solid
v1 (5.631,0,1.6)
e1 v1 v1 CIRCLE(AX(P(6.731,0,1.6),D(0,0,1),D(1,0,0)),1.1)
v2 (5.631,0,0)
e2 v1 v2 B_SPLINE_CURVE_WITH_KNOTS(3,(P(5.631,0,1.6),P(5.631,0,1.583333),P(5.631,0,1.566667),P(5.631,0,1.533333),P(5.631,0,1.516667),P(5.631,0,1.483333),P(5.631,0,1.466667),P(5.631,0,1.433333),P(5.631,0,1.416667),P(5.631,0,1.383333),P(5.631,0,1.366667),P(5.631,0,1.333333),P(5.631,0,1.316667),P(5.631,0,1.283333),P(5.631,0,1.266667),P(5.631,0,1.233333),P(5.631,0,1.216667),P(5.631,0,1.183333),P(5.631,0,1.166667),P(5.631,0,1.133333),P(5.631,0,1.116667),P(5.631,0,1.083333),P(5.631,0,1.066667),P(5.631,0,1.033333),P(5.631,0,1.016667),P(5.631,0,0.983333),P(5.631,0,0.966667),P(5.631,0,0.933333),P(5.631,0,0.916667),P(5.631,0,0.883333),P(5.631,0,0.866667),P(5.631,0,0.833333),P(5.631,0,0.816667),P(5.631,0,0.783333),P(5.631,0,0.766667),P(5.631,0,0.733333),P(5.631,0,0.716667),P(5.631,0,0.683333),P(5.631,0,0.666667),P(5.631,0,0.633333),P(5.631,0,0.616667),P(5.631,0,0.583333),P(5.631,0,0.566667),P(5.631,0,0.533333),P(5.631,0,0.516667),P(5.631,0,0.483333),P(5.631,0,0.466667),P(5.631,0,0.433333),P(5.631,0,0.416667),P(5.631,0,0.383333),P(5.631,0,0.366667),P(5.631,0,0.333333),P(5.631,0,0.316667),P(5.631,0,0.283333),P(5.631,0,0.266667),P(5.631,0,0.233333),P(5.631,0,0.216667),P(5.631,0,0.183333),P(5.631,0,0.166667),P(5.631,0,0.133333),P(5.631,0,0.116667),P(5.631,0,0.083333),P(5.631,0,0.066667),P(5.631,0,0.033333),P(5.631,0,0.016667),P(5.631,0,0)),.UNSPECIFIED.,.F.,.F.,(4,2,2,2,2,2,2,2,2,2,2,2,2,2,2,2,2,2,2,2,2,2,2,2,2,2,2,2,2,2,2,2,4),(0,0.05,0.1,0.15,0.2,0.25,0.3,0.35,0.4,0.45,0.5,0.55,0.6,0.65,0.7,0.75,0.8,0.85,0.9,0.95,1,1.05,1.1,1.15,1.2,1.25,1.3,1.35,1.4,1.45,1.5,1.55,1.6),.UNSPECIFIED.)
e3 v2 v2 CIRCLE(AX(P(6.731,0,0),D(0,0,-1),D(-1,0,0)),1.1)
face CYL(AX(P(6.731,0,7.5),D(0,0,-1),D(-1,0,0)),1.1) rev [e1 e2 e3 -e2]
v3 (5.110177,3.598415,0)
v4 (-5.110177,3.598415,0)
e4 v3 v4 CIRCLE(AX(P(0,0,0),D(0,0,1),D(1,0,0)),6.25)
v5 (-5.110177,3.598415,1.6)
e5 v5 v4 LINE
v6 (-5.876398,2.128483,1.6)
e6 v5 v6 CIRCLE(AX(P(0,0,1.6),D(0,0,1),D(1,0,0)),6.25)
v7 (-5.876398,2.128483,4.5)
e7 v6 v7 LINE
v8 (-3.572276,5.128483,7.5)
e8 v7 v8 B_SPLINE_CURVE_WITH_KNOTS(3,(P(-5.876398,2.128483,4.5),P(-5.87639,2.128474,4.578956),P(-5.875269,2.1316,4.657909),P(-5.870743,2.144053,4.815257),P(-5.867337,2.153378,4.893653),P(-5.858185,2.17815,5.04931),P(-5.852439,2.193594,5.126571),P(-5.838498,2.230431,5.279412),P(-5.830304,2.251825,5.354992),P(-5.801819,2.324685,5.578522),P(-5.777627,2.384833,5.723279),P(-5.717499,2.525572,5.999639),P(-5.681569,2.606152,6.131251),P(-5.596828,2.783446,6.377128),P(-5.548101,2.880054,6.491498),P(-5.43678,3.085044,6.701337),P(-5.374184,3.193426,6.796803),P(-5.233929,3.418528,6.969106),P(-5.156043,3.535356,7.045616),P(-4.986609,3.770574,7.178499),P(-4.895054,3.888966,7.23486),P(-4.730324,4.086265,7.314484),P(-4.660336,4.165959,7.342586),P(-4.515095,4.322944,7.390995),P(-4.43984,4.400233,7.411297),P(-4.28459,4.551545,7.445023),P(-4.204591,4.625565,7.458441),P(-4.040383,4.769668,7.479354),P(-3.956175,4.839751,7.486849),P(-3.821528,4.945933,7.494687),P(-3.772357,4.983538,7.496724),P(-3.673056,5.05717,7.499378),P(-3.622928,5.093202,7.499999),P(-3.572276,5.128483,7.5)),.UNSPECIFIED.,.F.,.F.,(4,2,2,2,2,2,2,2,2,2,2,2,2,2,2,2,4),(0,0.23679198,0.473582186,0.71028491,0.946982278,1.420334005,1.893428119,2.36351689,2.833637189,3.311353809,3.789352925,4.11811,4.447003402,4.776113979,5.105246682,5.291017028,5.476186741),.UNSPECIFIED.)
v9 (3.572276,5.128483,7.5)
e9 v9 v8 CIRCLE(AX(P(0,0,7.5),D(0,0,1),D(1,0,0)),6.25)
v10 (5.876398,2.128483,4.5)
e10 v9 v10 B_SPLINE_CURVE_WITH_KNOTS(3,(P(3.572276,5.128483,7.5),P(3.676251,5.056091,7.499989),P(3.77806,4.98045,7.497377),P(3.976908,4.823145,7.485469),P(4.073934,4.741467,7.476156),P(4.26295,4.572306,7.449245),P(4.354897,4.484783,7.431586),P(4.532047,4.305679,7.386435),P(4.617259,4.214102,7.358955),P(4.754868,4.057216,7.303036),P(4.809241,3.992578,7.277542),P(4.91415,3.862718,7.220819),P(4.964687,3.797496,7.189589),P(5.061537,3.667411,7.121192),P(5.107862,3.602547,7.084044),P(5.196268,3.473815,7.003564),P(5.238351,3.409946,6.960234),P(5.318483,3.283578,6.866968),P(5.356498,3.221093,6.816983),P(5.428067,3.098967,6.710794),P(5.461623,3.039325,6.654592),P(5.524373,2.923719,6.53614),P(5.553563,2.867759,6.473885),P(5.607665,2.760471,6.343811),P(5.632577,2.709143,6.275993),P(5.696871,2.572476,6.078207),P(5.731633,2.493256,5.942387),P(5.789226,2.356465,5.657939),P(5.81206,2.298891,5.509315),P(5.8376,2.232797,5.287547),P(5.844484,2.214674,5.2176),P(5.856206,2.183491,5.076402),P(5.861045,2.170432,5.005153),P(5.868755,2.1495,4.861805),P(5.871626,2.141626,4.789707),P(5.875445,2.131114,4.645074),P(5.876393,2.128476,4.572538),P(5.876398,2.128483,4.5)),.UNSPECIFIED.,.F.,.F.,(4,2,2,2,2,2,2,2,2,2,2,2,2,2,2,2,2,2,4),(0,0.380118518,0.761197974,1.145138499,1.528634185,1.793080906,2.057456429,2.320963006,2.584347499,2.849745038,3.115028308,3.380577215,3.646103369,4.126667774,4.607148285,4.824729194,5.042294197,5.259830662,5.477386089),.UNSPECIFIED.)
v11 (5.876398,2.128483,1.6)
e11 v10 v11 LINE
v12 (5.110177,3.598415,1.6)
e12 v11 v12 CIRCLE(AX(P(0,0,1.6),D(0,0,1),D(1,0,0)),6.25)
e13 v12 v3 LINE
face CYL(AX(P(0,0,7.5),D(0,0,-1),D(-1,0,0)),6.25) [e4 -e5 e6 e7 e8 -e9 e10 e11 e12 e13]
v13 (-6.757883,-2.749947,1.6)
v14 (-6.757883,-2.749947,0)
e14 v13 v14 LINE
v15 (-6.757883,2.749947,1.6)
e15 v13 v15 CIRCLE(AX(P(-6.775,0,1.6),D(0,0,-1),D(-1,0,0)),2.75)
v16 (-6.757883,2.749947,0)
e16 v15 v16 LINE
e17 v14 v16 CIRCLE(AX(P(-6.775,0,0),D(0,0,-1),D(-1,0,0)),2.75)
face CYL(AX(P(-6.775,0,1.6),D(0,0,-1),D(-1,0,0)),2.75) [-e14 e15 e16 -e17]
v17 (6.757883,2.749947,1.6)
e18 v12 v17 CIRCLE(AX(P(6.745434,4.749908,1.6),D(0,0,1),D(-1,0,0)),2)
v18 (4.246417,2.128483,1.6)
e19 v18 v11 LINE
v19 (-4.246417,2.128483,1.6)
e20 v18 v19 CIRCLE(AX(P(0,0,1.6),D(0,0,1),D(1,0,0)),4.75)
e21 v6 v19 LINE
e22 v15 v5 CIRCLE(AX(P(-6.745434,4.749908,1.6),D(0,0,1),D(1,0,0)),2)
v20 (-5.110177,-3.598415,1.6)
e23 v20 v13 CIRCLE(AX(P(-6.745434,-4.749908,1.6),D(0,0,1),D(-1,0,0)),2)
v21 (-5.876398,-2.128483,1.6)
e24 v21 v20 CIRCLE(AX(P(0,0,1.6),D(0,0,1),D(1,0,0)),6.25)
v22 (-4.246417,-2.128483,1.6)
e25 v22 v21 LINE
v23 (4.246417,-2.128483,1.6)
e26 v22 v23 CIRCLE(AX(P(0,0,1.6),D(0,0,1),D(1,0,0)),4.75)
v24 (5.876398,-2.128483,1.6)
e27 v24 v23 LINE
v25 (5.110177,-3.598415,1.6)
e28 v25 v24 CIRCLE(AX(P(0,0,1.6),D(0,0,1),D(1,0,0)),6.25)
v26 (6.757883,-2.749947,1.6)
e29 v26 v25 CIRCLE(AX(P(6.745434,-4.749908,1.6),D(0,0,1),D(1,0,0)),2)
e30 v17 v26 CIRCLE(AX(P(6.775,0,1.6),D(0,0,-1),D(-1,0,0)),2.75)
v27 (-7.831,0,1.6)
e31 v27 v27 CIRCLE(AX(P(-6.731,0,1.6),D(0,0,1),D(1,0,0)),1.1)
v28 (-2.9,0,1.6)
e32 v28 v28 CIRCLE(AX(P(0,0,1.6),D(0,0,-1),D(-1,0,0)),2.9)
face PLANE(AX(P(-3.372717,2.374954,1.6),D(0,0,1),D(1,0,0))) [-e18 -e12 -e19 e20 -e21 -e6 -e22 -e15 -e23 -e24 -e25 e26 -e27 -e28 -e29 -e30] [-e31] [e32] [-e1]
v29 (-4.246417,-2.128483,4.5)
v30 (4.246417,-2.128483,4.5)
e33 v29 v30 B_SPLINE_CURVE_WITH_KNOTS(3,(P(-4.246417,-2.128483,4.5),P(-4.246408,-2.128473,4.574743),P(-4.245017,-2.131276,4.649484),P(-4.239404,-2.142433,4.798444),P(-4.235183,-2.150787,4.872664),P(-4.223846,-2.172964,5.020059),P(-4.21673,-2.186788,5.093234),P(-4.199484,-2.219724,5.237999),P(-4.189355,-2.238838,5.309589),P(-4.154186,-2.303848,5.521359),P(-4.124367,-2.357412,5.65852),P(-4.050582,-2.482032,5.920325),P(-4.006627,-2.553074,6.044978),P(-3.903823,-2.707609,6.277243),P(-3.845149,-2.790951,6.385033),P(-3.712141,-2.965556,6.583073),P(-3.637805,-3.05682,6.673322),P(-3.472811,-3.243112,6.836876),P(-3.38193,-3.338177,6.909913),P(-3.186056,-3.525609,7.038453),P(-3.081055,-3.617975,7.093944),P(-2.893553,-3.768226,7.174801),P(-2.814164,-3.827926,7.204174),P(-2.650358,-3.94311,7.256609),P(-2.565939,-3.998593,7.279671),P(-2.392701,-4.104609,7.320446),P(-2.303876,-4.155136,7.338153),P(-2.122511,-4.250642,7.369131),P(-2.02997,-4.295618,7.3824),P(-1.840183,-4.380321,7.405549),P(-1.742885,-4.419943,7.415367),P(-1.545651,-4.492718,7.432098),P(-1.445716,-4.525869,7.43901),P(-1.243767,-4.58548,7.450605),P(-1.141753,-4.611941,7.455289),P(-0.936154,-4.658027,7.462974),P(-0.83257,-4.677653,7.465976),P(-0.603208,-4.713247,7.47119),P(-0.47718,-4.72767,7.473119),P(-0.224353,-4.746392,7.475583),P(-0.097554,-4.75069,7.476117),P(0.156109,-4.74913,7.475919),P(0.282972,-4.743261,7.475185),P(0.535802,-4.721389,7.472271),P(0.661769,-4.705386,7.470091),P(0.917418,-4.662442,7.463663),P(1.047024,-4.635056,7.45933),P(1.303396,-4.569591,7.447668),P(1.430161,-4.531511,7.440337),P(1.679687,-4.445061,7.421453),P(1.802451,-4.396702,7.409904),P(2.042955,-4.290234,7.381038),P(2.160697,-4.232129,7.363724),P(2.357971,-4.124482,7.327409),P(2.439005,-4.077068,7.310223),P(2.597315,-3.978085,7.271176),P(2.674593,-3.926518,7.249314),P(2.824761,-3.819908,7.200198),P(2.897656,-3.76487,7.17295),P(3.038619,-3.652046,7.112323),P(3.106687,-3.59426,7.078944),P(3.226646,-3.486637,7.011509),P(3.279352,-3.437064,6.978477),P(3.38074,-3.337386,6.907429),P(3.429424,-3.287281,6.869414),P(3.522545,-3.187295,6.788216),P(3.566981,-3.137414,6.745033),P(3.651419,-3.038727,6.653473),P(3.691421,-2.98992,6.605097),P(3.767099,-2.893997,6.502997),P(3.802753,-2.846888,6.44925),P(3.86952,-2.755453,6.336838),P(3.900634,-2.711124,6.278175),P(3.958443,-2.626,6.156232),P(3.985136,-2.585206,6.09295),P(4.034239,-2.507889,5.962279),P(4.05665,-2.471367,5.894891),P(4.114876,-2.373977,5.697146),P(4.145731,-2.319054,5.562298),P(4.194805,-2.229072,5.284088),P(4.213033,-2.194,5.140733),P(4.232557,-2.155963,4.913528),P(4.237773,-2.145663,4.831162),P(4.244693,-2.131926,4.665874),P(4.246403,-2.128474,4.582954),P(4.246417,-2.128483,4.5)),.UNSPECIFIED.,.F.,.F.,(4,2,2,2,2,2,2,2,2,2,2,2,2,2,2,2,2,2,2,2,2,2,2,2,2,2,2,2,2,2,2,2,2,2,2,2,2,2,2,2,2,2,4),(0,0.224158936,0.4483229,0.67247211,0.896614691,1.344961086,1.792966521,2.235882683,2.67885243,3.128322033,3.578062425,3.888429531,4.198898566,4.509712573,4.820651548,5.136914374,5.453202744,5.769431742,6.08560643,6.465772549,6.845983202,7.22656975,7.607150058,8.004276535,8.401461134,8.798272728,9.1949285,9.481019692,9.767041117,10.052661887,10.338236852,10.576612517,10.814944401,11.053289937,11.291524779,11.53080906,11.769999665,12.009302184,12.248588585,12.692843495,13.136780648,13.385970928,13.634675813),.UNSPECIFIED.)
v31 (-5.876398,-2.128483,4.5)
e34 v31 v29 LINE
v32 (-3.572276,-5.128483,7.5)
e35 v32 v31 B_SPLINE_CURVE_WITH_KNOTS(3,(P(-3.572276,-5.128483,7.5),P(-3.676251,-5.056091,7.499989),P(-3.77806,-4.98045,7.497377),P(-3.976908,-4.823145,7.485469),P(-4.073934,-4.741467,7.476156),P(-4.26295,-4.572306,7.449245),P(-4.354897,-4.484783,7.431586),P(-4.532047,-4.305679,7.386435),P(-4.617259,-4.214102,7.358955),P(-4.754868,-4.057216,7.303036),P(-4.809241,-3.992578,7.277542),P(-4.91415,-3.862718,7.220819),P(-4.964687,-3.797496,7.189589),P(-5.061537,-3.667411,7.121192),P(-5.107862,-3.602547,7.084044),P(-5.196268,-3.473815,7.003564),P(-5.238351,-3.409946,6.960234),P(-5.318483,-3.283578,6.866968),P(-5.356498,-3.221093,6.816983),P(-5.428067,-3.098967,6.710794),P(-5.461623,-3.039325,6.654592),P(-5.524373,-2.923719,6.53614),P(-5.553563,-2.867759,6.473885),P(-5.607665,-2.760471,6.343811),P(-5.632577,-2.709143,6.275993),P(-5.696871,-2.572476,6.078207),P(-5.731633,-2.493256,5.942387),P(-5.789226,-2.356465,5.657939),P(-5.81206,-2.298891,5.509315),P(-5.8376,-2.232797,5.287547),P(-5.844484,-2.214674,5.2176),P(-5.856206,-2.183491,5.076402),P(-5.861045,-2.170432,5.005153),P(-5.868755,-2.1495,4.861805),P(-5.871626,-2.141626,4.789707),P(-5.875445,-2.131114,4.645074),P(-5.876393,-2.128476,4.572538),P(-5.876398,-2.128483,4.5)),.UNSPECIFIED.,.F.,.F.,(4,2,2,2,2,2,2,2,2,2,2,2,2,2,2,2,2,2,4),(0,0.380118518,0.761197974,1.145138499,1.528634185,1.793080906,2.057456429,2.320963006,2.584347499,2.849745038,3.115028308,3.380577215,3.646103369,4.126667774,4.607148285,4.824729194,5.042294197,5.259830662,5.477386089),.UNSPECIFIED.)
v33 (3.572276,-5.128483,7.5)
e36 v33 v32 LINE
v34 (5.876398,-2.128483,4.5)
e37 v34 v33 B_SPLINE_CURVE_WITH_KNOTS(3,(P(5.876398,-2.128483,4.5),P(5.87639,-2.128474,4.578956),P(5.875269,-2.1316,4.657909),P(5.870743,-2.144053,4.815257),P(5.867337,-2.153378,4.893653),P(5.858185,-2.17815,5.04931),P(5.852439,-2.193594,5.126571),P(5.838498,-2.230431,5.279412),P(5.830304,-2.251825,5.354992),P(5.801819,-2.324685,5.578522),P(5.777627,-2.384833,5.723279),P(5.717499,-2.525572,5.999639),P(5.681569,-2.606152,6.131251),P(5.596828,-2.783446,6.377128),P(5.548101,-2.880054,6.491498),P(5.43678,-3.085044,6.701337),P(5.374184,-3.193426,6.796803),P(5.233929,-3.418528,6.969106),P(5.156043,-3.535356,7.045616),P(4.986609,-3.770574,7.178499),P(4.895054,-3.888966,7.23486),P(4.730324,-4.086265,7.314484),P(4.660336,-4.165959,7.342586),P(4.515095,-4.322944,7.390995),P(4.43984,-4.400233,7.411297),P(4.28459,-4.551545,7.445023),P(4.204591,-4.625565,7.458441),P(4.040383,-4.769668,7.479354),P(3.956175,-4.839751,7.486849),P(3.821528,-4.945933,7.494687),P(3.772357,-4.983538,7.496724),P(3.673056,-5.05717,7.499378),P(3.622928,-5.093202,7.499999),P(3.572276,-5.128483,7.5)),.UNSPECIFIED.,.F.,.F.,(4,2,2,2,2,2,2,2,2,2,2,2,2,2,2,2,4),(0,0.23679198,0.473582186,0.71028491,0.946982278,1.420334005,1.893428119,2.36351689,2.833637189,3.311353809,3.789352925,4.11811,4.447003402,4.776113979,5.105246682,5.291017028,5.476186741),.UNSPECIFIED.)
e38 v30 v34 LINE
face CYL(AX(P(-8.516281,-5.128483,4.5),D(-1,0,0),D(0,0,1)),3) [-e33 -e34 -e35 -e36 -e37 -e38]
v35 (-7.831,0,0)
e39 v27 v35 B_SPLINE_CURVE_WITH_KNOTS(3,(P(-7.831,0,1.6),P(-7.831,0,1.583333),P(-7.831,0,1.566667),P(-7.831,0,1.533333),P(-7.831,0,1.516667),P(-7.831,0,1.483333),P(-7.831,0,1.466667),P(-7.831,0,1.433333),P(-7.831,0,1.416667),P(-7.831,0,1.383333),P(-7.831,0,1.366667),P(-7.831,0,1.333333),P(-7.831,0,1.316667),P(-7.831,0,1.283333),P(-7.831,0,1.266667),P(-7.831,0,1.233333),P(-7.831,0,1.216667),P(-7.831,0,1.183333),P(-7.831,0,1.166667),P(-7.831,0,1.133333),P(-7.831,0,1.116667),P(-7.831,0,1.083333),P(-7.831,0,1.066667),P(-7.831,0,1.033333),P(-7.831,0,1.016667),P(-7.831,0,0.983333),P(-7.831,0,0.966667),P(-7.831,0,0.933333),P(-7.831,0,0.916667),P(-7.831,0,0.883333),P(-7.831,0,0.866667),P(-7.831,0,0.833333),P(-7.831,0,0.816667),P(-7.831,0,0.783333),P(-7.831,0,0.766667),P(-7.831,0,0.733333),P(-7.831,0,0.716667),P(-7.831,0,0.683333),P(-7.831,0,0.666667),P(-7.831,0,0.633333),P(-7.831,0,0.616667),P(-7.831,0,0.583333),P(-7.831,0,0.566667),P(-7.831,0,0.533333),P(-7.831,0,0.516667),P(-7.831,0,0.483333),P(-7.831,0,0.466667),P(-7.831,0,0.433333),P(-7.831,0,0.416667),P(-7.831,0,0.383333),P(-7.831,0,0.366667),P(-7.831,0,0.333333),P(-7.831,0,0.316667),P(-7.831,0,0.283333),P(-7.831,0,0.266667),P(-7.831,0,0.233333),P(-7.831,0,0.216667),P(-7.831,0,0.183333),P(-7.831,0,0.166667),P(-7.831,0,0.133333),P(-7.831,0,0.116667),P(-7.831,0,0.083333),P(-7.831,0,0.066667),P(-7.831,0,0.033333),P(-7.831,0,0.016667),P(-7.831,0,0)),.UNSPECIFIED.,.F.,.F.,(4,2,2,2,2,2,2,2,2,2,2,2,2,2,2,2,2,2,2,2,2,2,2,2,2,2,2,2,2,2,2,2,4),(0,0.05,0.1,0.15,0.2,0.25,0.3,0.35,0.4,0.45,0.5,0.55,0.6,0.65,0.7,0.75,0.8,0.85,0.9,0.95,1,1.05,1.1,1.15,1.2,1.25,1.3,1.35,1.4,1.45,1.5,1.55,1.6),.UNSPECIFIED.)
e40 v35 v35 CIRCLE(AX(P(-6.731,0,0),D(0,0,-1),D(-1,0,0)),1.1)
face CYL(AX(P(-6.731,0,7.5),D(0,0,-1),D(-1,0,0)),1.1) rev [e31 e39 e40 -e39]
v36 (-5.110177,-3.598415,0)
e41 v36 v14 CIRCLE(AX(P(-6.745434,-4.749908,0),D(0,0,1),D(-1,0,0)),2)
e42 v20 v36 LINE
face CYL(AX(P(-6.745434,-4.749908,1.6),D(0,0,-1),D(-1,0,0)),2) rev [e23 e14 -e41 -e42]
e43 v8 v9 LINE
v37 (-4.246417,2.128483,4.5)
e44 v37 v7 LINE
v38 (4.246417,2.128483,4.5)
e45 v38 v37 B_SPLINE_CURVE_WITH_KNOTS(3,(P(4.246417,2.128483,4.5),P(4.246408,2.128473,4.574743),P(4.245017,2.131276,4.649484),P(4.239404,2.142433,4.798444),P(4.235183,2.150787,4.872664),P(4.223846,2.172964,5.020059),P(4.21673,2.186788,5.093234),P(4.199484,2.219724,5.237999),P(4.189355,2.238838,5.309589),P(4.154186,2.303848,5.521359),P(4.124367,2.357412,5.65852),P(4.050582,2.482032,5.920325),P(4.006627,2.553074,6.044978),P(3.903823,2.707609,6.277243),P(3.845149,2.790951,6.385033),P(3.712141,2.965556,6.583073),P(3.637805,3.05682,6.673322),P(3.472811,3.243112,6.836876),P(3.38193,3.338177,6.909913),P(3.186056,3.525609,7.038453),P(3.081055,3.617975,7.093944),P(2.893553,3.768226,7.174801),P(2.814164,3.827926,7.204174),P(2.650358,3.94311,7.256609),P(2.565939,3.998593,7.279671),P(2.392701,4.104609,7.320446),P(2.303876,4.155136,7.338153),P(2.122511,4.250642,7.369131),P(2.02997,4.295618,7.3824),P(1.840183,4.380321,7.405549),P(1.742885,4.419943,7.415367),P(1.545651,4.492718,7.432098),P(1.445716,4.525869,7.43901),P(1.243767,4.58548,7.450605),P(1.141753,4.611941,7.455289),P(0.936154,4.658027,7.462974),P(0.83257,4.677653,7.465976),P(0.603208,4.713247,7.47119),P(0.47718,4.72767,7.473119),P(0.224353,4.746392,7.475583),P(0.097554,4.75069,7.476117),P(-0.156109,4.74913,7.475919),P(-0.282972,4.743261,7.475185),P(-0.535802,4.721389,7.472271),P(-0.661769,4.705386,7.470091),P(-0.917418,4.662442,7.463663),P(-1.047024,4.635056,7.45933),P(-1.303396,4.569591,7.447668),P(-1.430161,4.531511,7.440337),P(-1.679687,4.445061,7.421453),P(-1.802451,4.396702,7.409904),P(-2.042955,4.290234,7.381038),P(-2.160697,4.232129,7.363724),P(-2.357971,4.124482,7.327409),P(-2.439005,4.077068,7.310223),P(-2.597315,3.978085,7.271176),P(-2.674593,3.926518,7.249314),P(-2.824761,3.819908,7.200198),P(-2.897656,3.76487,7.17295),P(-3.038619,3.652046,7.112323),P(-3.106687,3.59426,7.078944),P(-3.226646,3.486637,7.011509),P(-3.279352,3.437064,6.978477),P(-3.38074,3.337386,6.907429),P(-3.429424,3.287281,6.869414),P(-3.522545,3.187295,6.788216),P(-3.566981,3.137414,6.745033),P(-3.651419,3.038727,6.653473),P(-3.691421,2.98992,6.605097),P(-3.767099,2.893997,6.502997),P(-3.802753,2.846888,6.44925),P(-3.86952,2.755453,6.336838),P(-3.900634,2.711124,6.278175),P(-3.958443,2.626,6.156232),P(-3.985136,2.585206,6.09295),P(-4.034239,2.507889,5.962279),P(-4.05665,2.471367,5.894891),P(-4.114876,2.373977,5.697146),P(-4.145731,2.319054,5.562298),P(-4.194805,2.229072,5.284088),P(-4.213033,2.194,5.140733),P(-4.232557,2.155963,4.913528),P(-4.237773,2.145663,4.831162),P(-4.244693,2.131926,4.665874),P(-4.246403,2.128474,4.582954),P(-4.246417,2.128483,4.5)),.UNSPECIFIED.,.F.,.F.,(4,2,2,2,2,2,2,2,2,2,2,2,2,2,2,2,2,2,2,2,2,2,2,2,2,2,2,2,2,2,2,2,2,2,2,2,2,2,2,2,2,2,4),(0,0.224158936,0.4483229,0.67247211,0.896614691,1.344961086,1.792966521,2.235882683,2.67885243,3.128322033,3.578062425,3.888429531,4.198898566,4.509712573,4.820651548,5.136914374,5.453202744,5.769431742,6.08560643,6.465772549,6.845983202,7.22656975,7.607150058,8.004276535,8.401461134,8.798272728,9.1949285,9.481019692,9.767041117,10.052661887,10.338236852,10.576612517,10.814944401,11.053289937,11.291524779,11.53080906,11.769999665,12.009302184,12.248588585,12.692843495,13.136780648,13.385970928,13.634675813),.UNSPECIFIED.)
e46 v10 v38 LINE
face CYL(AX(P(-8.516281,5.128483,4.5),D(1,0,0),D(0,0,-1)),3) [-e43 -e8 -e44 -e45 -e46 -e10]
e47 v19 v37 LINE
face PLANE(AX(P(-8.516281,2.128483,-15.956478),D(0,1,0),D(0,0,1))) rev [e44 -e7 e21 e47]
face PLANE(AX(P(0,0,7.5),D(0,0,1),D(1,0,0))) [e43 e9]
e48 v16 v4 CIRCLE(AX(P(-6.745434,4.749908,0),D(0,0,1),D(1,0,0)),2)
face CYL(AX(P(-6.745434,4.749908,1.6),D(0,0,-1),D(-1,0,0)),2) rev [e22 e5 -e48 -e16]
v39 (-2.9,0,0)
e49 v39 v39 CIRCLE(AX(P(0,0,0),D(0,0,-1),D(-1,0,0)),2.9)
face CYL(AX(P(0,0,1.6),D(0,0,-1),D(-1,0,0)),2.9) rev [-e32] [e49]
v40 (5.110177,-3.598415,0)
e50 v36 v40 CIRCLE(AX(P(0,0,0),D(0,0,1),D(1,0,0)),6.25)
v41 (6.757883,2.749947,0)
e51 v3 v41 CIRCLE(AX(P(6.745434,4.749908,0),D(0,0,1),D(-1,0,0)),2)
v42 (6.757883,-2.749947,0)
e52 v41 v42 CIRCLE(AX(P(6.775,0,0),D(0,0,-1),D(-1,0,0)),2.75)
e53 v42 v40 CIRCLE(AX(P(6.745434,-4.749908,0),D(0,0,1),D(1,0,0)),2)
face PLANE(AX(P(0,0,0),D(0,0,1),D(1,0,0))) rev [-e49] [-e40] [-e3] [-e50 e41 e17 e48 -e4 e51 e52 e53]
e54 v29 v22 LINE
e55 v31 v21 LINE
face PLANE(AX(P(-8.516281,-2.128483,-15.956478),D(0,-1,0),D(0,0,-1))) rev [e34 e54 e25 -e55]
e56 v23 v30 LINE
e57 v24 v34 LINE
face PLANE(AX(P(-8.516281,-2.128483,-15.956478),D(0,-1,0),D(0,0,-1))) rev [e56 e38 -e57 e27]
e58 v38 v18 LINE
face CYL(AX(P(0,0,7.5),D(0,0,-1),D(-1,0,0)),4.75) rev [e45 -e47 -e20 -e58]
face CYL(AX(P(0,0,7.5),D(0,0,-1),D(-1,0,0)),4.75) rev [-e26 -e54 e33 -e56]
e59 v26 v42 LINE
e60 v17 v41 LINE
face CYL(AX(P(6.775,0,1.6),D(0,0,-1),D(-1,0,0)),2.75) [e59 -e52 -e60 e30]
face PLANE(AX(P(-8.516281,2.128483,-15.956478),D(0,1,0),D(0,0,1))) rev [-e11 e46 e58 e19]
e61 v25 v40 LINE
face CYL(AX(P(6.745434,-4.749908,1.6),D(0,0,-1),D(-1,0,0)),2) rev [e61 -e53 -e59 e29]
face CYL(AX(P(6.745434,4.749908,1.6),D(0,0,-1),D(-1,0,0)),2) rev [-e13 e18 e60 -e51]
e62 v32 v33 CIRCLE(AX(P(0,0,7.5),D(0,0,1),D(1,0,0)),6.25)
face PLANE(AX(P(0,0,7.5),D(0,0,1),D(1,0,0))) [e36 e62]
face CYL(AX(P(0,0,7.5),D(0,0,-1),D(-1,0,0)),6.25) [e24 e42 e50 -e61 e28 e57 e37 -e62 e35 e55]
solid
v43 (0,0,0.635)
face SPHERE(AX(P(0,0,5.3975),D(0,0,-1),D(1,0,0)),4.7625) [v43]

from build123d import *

# Parameters (mm, degrees)
SKETCH1_R           = 6.25
SKETCH1_R_2         = 4.750000000000001
BOSS_EXTRUDE1_DEPTH = 7.5
SKETCH2_R           = 2.9
BOSS_EXTRUDE2_DEPTH = 1.6
SKETCH4_W           = 17.032561562560232
SKETCH4_H           = 4.256966638696863
CUT_EXTRUDE1_DEPTH  = 5.9
FILLET1_R           = 3
SKETCH5_R           = 1.1
SKETCH5_R_2         = 1.0999999999999992
CUT_EXTRUDE2_DEPTH  = 14.63957945649352


with BuildPart() as part:
    # Sketch1 → Boss-Extrude1 (new body)
    with BuildSketch(Plane.XY):
        Circle(SKETCH1_R)
        Circle(SKETCH1_R_2, mode=Mode.SUBTRACT)
    extrude(amount=BOSS_EXTRUDE1_DEPTH)

    # Sketch2 → Boss-Extrude2 (add)
    with BuildSketch(Plane(origin=(0, 0, 0), x_dir=(-1, 0, 0), z_dir=(0, 0, -1))):
        with BuildLine():
            ThreePointArc((-6.757882598562828, 2.7499467257690724), (-9.525000000000002, 3.4e-16), (-6.757882598562828, -2.7499467257690724))
            ThreePointArc((-6.757882598562828, -2.7499467257690724), (-5.829818598679689, -2.9718052821530714), (-5.110176954042268, -3.5984151370256456))
            ThreePointArc((-5.110176954042268, -3.5984151370256456), (3.8e-16, -6.250000000000001), (5.110176954042268, -3.5984151370256447))
            ThreePointArc((5.110176954042268, -3.5984151370256447), (5.829818598679689, -2.9718052821530705), (6.757882598562827, -2.7499467257690715))
            ThreePointArc((6.757882598562827, -2.7499467257690715), (9.525, 0), (6.757882598562827, 2.7499467257690715))
            ThreePointArc((6.757882598562827, 2.7499467257690715), (5.829818598679689, 2.9718052821530705), (5.110176954042268, 3.5984151370256447))
            ThreePointArc((5.110176954042268, 3.5984151370256447), (3.8e-16, 6.25), (-5.110176954042268, 3.5984151370256456))
            ThreePointArc((-5.110176954042268, 3.5984151370256456), (-5.829818598679689, 2.9718052821530714), (-6.757882598562828, 2.7499467257690724))
        make_face()
        Circle(SKETCH2_R, mode=Mode.SUBTRACT)
    extrude(amount=-BOSS_EXTRUDE2_DEPTH)

    # Sketch4 → Cut-Extrude1 (cut)
    with BuildSketch(Plane.XY.offset(7.5)):
        Rectangle(SKETCH4_W, SKETCH4_H)
    extrude(amount=-CUT_EXTRUDE1_DEPTH, mode=Mode.SUBTRACT)

    # Fillet1
    # the kernel refuses this fillet: 3 mm, written as the material it takes off along each edge
    with BuildSketch(Plane(origin=(-13.376398451369308, -2.1284833193484314, 7.5), x_dir=(0, 0, -1), z_dir=(1, 0, 0))) as fillet1_piece_1:
        with BuildLine():
            CenterArc((FILLET1_R, -FILLET1_R), FILLET1_R, 90, 90)
            Line((0, -FILLET1_R), (0, 0))
            Line((0, 0), (FILLET1_R, 0))
        make_face()
    extrude(amount=16.629981284008707, mode=Mode.SUBTRACT)
    with BuildSketch(Plane(origin=(-3.253582832639439, -2.1284833193484314, 7.5), x_dir=(0, -1, 0), z_dir=(1, 0, 0))) as fillet1_piece_2:
        with BuildLine():
            CenterArc((FILLET1_R, FILLET1_R), FILLET1_R, 180, 90)
            Line((0, FILLET1_R), (0, 0))
            Line((0, 0), (FILLET1_R, 0))
        make_face()
    extrude(amount=16.629981284008785, mode=Mode.SUBTRACT)
    with BuildSketch(Plane(origin=(13.376398451369345, 2.1284833193484314, 7.5), x_dir=(0, 0, -1), z_dir=(-1, 0, 0))) as fillet1_piece_3:
        with BuildLine():
            CenterArc((FILLET1_R, -FILLET1_R), FILLET1_R, 90, 90)
            Line((0, -FILLET1_R), (0, 0))
            Line((0, 0), (FILLET1_R, 0))
        make_face()
    extrude(amount=16.629981284008785, mode=Mode.SUBTRACT)
    with BuildSketch(Plane(origin=(3.253582832639398, 2.1284833193484314, 7.5), x_dir=(0, 1, 0), z_dir=(-1, 0, 0))) as fillet1_piece_4:
        with BuildLine():
            CenterArc((FILLET1_R, FILLET1_R), FILLET1_R, 180, 90)
            Line((0, FILLET1_R), (0, 0))
            Line((0, 0), (FILLET1_R, 0))
        make_face()
    extrude(amount=16.629981284008707, mode=Mode.SUBTRACT)

    # Sketch5 → Cut-Extrude2 (cut, through all)
    with BuildSketch(Plane(origin=(0, 0, 0), x_dir=(-1, 0, 0), z_dir=(0, 0, -1))):
        with Locations((-6.731, 0)):
            Circle(SKETCH5_R)
        with Locations((6.731, 0)):
            Circle(SKETCH5_R_2)
    extrude(amount=-CUT_EXTRUDE2_DEPTH, mode=Mode.SUBTRACT)


with BuildPart() as body_2:
    # Sketch6 → Revolve1 (revolve)
    with BuildSketch(Plane(origin=(0, 0, 0), x_dir=(1, 0, 0), z_dir=(0, 1, 0))):
        with BuildLine():
            Line((1.79e-15, -0.6350000000000001), (2.37e-15, -10.16))
            ThreePointArc((2.37e-15, -10.16), (4.762500000000002, -5.3975), (1.79e-15, -0.6350000000000001))
        make_face()
    revolve(axis=Axis((1.79e-15, 0, 0.6350000000000001), (6e-17, 0, 1)))


solid = Compound([part.part, body_2.part])
